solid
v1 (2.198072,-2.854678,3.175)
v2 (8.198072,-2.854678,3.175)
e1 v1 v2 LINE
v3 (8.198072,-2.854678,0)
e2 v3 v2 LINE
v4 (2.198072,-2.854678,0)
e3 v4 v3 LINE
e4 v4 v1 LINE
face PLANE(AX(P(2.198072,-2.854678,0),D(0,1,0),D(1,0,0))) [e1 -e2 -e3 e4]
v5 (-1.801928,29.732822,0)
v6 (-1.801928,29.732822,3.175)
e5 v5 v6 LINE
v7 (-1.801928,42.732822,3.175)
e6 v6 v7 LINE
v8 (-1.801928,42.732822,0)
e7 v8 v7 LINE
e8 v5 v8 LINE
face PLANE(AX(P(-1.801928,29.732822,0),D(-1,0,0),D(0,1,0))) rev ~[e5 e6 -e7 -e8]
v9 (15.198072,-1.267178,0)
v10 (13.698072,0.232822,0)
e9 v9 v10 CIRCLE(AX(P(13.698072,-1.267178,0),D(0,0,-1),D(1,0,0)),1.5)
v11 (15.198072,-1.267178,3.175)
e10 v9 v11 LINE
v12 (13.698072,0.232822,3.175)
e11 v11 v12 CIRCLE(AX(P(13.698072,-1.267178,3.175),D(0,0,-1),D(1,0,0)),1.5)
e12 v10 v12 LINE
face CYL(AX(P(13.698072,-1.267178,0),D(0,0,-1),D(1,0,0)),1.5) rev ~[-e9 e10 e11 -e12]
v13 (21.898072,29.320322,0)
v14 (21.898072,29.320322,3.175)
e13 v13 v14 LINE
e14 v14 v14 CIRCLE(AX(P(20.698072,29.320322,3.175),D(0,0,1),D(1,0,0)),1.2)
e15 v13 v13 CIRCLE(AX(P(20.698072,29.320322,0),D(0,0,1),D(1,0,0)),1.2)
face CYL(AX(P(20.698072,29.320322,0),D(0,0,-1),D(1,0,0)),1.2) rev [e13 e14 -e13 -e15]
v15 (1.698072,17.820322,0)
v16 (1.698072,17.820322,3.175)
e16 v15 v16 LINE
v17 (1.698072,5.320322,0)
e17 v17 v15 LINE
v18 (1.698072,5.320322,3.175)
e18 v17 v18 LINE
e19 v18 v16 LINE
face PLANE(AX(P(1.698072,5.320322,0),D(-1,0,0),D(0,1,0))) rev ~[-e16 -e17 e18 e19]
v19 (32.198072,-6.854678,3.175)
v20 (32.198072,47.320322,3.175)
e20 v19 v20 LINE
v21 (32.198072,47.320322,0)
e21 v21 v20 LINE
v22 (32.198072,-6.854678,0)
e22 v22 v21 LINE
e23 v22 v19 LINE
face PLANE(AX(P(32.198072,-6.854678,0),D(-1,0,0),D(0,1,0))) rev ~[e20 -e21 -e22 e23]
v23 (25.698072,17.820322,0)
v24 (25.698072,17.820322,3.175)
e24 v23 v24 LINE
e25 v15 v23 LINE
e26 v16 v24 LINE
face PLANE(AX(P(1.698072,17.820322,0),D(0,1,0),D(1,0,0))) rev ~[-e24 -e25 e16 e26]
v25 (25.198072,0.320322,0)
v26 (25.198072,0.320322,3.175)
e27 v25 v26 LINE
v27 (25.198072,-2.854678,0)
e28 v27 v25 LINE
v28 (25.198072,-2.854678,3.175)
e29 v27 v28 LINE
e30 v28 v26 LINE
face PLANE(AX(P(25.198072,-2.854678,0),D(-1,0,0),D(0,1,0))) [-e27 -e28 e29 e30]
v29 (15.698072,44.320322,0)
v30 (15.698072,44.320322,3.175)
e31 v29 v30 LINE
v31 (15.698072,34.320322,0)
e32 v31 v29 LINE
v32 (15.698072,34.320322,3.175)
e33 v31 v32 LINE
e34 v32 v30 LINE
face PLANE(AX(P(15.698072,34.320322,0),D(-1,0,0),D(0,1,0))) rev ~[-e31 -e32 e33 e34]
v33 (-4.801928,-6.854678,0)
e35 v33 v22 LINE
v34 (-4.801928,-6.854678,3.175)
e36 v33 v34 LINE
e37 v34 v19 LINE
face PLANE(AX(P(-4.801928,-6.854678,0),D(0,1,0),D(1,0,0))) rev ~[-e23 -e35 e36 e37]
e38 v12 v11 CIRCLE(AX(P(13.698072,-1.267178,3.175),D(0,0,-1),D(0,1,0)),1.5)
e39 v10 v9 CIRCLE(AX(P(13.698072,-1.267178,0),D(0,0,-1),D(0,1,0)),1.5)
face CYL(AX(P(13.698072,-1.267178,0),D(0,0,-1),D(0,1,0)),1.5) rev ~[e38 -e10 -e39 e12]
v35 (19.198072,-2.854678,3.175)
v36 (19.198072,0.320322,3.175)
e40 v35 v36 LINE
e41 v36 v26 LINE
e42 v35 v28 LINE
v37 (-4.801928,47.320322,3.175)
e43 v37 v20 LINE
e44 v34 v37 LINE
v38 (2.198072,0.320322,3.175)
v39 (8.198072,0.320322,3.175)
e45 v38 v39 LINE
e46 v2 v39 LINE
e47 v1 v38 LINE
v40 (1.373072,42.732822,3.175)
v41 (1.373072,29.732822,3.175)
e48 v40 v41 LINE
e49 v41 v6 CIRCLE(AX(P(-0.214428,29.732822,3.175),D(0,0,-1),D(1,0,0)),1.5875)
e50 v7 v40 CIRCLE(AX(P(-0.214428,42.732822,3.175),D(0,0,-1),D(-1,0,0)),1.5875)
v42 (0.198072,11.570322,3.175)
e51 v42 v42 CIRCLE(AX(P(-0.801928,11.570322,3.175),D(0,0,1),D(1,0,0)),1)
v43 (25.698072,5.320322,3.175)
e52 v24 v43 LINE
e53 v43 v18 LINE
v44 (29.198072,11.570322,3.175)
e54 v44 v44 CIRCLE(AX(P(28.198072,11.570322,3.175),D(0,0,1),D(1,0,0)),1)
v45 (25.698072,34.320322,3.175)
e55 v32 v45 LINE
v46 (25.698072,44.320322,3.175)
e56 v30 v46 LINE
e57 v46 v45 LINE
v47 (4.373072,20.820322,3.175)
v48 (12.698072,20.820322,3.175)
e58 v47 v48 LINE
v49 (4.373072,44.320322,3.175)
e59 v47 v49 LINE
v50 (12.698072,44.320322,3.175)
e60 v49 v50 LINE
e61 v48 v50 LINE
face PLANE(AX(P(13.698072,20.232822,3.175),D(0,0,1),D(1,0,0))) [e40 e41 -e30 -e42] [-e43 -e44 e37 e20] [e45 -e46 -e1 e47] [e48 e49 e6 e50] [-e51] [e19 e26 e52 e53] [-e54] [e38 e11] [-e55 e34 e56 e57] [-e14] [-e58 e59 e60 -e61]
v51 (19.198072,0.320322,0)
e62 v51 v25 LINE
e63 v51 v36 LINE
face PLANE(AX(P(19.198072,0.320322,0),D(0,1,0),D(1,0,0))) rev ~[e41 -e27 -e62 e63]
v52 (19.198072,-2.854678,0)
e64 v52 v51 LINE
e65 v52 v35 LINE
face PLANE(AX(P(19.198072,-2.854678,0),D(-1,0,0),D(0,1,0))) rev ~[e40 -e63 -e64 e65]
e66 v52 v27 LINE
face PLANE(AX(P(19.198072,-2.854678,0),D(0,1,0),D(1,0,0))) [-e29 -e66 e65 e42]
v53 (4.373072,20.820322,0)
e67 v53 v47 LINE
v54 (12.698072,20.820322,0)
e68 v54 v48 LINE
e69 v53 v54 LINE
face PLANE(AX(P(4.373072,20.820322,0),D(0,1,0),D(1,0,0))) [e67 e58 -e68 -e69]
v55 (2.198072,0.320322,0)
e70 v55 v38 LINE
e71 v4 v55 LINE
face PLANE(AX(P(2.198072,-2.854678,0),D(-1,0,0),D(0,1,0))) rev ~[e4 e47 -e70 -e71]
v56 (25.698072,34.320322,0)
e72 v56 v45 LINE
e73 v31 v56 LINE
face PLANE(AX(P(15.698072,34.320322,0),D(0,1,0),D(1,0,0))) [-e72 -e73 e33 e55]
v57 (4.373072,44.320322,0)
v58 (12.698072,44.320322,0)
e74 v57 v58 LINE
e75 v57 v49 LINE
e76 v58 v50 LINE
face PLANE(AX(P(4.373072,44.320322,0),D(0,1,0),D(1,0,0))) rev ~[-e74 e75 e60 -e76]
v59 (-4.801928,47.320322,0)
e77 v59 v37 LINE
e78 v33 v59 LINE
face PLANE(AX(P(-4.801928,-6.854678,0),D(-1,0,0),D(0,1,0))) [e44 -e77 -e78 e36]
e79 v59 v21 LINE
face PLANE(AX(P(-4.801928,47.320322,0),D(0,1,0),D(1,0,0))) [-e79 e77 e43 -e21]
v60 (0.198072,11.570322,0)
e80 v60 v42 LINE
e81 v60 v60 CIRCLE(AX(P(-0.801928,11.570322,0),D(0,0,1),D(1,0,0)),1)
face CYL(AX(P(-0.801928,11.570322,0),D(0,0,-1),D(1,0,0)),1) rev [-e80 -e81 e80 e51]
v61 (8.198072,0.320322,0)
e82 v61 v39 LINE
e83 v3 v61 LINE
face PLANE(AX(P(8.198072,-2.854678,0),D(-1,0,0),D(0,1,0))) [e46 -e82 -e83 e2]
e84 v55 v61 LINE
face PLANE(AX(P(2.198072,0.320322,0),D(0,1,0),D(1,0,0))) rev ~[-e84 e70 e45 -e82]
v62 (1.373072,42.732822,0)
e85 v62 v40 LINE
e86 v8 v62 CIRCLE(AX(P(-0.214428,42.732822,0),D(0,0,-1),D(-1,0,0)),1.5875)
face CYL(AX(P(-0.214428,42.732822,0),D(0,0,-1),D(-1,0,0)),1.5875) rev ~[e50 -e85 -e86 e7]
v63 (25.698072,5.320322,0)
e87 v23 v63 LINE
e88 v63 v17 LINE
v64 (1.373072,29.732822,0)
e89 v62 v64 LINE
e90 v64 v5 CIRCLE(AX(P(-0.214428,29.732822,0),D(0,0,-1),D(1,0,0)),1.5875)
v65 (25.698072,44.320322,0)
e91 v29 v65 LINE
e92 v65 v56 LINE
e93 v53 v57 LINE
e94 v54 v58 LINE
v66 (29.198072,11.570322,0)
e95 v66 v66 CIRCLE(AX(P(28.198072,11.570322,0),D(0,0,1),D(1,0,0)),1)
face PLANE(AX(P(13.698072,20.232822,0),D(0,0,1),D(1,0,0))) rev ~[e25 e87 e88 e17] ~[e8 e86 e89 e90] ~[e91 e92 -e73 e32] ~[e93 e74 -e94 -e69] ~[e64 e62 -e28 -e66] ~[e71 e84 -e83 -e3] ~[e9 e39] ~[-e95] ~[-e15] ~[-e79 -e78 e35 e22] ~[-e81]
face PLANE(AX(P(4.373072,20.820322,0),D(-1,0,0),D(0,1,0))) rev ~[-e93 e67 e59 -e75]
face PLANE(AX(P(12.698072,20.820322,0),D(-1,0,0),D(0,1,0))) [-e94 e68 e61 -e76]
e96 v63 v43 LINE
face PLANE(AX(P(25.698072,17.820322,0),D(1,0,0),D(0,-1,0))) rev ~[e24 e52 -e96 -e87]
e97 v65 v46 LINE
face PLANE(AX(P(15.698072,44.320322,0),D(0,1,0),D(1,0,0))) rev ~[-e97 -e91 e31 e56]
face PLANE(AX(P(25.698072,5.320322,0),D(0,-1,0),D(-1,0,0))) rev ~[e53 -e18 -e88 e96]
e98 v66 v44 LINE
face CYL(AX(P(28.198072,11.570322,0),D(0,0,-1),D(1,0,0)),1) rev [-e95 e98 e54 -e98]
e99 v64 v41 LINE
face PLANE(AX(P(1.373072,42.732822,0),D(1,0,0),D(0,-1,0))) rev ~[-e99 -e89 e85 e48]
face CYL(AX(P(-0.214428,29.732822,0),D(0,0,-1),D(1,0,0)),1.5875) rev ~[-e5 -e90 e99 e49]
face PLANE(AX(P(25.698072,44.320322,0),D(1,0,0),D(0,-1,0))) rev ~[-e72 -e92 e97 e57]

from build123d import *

# Parameters (mm, degrees)
F0_W     = 37
F0_H     = 54.175
F0_W_2   = 6
F0_H_2   = 3.175
F0_R     = 1
F0_W_3   = 8.325
F0_H_3   = 23.5
F0_W_4   = 10
F0_H_4   = 10
F0_R_2   = 1.2
F1_DEPTH = 3.175


# Not quite as in the source:
# - a length typed as a fraction of an inch, garbled in the dataset ("3 / 203.2 mm" for 3/8 in), is restored
# - a feature names something its author has since deleted; it is built from what else it names


with BuildPart() as f1:
    # F0 (on Top) → F1 (new body)
    with BuildSketch(Plane.XY):
        with Locations((13.6980720539, 20.2328219792)):
            Rectangle(F0_W, F0_H)
        with Locations((5.1980720539, -1.2671780208)):
            Rectangle(F0_W_2, F0_H_2, mode=Mode.SUBTRACT)
        with Locations((-0.8019279461, 11.5703219792)):
            Circle(F0_R, mode=Mode.SUBTRACT)
        with BuildLine():
            ThreePointArc((13.6980720539, 0.2328219792), (14.7587322257, -0.2065178491), (15.1980720539, -1.2671780208))
            ThreePointArc((15.1980720539, -1.2671780208), (12.6374118822, -2.3278381926), (13.6980720539, 0.2328219792))
        make_face(mode=Mode.SUBTRACT)
        with Locations((22.1980720539, -1.2671780208)):
            Rectangle(F0_W_2, F0_H_2, mode=Mode.SUBTRACT)
        Polygon((1.6980720539, 5.3203219792), (1.6980720539, 17.8203219792), (13.6980720539, 17.8203219792), (25.6980720539, 17.8203219792), (25.6980720539, 5.3203219792), align=None, mode=Mode.SUBTRACT)
        with Locations((28.1980720539, 11.5703219792)):
            Circle(F0_R, mode=Mode.SUBTRACT)
        with Locations((8.5355720539, 32.5703219792)):
            Rectangle(F0_W_3, F0_H_3, mode=Mode.SUBTRACT)
        with BuildLine():
            ThreePointArc((-1.8019279461, 42.7328219792), (-0.2144279461, 44.3203219792), (1.3730720539, 42.7328219792))
            Line((1.3730720539, 42.7328219792), (1.3730720539, 29.7328219792))
            ThreePointArc((1.3730720539, 29.7328219792), (-0.2144279461, 28.1453219792), (-1.8019279461, 29.7328219792))
            Line((-1.8019279461, 29.7328219792), (-1.8019279461, 42.7328219792))
        make_face(mode=Mode.SUBTRACT)
        Polygon((15.6980720539, 24.3203219792), (15.6980720539, 34.3203219792), (15.6980720539, 44.3203219792), (25.6980720539, 44.3203219792), (25.6980720539, 34.3203219792), (25.6980720539, 24.3203219792), align=None, mode=Mode.SUBTRACT)
        with Locations((20.6980720539, 29.3203219792)):
            Rectangle(F0_W_4, F0_H_4)
        with Locations((20.6980720539, 29.3203219792)):
            Circle(F0_R_2, mode=Mode.SUBTRACT)
    extrude(amount=F1_DEPTH)


solid = f1.part
